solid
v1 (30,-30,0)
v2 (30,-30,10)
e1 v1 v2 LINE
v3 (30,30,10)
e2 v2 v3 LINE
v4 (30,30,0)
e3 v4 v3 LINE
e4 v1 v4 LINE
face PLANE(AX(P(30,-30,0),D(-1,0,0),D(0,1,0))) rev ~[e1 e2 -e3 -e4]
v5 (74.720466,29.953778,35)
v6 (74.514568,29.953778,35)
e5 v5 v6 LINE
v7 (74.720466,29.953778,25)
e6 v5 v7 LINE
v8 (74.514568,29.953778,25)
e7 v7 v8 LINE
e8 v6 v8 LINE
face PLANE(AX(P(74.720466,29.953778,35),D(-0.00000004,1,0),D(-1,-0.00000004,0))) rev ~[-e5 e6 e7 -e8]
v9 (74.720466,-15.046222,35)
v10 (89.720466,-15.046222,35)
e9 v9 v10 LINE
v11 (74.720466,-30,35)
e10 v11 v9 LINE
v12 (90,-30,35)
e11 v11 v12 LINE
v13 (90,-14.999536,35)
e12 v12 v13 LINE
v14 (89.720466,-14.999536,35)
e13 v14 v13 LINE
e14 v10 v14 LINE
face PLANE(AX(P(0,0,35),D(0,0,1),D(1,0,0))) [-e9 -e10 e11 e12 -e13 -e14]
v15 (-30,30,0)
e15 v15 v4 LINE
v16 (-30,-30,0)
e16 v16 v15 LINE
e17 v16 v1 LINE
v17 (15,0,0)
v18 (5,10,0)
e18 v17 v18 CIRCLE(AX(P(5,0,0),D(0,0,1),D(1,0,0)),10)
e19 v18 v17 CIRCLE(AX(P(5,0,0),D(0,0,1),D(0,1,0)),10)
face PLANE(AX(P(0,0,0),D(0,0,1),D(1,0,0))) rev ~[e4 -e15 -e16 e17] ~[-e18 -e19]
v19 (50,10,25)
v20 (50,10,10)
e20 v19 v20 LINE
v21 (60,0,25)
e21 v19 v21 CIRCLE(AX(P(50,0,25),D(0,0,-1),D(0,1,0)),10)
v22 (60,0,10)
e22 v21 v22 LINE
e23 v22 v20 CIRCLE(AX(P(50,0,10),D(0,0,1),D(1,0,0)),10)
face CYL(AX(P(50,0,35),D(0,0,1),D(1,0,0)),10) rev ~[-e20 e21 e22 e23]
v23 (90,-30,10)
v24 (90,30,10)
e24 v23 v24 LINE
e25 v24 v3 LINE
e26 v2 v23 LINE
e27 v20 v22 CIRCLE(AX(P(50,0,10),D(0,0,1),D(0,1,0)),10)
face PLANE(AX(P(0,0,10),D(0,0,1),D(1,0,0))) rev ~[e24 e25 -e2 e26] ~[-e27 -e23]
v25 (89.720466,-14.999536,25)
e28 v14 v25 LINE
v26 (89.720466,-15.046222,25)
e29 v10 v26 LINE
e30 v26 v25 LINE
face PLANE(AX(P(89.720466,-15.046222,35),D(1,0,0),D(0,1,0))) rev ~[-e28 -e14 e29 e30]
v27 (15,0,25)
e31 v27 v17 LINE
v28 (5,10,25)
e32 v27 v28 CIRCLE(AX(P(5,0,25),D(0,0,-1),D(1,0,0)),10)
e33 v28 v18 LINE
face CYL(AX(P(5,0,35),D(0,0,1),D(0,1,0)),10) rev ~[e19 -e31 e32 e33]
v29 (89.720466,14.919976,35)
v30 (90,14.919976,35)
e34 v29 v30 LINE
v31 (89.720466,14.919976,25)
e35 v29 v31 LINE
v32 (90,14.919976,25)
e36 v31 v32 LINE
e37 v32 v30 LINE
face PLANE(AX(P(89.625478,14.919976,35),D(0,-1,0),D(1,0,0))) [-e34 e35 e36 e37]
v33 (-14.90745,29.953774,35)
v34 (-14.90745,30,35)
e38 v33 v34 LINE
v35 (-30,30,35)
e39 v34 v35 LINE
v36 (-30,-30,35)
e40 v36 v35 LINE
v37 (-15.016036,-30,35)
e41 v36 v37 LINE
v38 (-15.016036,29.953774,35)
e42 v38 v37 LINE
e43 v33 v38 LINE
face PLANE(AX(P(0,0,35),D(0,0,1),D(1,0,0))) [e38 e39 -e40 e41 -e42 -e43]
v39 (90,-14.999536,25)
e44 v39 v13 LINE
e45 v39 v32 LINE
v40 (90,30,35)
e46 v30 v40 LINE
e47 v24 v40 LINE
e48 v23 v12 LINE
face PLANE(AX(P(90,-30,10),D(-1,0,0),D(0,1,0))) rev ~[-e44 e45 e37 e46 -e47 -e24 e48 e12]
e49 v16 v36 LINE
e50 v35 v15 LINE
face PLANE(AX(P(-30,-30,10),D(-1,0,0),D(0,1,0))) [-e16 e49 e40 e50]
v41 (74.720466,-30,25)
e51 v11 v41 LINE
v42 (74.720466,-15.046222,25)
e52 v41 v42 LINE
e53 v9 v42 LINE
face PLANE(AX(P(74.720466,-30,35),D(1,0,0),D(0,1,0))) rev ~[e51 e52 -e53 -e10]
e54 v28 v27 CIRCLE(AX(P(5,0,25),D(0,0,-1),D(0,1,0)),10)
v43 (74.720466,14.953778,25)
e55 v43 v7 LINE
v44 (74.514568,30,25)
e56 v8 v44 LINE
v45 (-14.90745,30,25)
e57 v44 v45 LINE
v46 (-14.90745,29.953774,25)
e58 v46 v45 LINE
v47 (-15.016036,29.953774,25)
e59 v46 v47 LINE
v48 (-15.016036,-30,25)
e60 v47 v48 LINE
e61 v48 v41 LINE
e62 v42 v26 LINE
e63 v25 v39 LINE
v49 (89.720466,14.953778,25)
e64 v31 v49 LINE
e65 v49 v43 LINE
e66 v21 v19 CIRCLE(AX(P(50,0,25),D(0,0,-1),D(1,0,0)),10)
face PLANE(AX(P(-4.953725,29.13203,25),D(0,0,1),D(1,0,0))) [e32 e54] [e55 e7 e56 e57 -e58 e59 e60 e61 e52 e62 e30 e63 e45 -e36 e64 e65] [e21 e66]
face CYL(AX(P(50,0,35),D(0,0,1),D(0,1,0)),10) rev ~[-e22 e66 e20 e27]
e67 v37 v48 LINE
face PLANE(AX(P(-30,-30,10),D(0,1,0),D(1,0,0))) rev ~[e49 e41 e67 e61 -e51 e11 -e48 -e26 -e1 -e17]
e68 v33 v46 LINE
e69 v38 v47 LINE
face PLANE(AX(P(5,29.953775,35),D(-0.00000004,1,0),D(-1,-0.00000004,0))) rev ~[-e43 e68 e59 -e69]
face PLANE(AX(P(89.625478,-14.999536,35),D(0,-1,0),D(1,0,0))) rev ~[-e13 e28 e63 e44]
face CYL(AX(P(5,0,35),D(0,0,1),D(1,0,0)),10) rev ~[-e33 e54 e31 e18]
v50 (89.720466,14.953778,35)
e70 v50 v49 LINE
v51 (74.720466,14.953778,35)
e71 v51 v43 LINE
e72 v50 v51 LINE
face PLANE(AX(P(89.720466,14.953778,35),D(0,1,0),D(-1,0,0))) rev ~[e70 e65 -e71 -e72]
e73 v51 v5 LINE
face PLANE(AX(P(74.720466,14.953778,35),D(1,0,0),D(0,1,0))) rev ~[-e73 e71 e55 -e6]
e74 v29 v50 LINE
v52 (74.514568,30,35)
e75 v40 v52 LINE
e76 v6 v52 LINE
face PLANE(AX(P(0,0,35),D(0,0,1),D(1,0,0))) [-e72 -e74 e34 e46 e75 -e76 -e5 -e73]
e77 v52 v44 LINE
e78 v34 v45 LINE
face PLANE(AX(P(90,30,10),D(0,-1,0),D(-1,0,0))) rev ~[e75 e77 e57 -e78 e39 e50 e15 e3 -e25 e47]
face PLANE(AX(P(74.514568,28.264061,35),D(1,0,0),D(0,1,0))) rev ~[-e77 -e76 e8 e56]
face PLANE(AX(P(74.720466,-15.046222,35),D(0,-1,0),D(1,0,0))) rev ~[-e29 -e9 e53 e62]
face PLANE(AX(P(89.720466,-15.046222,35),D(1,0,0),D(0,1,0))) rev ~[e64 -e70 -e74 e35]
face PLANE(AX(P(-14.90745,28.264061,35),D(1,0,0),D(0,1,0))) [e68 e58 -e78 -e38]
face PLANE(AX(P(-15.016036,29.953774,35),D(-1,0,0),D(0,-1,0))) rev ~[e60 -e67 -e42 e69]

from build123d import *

# Parameters (mm, degrees)
F0_W      = 60
F0_H      = 60
F1_DEPTH  = 10
F2_W      = 60
F2_H      = 60
F3_DEPTH  = 25
F5_DEPTH  = 51.5
F7_DEPTH  = 10
F8_W      = 19.9074504152
F8_H      = 1.7359393835
F8_W_2    = 45
F8_W_3    = 24.514567852
F9_DEPTH  = 10
F10_W     = 2.977065742
F10_H     = 29.9195116386
F11_DEPTH = 10


with BuildPart() as f1:
    # F0 (on Top) → F1 (new body)
    with BuildSketch(Plane.XY):
        Rectangle(F0_W, F0_H)
    extrude(amount=F1_DEPTH)

    # F2 (on face) → F3 (join)
    with BuildSketch(Plane.XY.offset(10)):
        Rectangle(F2_W, F2_H)
        with Locations((60, 0)):
            Rectangle(F2_W, F2_H)
    extrude(amount=F3_DEPTH)

    # F4 (on face) → F5 (cut)
    with BuildSketch(Plane.XY.offset(35)):
        with BuildLine():
            ThreePointArc((60, 0), (57.0710678119, 7.0710678119), (50, 10))
            ThreePointArc((50, 10), (42.9289321881, -7.0710678119), (60, 0))
        make_face()
        with BuildLine():
            ThreePointArc((15, 0), (12.0710678119, 7.0710678119), (5, 10))
            ThreePointArc((5, 10), (-2.0710678119, -7.0710678119), (15, 0))
        make_face()
    extrude(amount=-F5_DEPTH, mode=Mode.SUBTRACT)

    # F6 (on face) → F7 (cut)
    with BuildSketch(Plane.XY.offset(35)):
        Polygon((5, 29.9537748588), (-15.0160359405, 29.9537740648), (-15.0160359405, -30), (74.7204658659, -30), (74.7204658659, -15.0462223754), (89.7204658659, -15.0462223754), (89.7204658659, 14.9537776246), (74.7204658659, 14.9537776246), (74.7204658659, 29.9537776246), (50, 29.953776644), align=None)
        with BuildLine():
            ThreePointArc((15, 0), (-2.0710678119, -7.0710678119), (5, 10))
            ThreePointArc((5, 10), (12.0710678119, 7.0710678119), (15, 0))
        make_face(mode=Mode.SUBTRACT)
        with BuildLine():
            ThreePointArc((60, 0), (42.9289321881, -7.0710678119), (50, 10))
            ThreePointArc((50, 10), (57.0710678119, 7.0710678119), (60, 0))
        make_face(mode=Mode.SUBTRACT)
    extrude(amount=-F7_DEPTH, mode=Mode.SUBTRACT)

    # F8 (on face) → F9 (cut)
    with BuildSketch(Plane.XY.offset(35)):
        with Locations((-4.9537252076, 29.1320303082)):
            Rectangle(F8_W, F8_H)
        with Locations((27.5, 29.1320303082)):
            Rectangle(F8_W_2, F8_H)
        with Locations((62.257283926, 29.1320303082)):
            Rectangle(F8_W_3, F8_H)
    extrude(amount=-F9_DEPTH, mode=Mode.SUBTRACT)

    # F10 (on face) → F11 (cut)
    with BuildSketch(Plane.XY.offset(35)):
        with Locations((91.1140106618, -0.0397800468)):
            Rectangle(F10_W, F10_H)
    extrude(amount=-F11_DEPTH, mode=Mode.SUBTRACT)


solid = f1.part
